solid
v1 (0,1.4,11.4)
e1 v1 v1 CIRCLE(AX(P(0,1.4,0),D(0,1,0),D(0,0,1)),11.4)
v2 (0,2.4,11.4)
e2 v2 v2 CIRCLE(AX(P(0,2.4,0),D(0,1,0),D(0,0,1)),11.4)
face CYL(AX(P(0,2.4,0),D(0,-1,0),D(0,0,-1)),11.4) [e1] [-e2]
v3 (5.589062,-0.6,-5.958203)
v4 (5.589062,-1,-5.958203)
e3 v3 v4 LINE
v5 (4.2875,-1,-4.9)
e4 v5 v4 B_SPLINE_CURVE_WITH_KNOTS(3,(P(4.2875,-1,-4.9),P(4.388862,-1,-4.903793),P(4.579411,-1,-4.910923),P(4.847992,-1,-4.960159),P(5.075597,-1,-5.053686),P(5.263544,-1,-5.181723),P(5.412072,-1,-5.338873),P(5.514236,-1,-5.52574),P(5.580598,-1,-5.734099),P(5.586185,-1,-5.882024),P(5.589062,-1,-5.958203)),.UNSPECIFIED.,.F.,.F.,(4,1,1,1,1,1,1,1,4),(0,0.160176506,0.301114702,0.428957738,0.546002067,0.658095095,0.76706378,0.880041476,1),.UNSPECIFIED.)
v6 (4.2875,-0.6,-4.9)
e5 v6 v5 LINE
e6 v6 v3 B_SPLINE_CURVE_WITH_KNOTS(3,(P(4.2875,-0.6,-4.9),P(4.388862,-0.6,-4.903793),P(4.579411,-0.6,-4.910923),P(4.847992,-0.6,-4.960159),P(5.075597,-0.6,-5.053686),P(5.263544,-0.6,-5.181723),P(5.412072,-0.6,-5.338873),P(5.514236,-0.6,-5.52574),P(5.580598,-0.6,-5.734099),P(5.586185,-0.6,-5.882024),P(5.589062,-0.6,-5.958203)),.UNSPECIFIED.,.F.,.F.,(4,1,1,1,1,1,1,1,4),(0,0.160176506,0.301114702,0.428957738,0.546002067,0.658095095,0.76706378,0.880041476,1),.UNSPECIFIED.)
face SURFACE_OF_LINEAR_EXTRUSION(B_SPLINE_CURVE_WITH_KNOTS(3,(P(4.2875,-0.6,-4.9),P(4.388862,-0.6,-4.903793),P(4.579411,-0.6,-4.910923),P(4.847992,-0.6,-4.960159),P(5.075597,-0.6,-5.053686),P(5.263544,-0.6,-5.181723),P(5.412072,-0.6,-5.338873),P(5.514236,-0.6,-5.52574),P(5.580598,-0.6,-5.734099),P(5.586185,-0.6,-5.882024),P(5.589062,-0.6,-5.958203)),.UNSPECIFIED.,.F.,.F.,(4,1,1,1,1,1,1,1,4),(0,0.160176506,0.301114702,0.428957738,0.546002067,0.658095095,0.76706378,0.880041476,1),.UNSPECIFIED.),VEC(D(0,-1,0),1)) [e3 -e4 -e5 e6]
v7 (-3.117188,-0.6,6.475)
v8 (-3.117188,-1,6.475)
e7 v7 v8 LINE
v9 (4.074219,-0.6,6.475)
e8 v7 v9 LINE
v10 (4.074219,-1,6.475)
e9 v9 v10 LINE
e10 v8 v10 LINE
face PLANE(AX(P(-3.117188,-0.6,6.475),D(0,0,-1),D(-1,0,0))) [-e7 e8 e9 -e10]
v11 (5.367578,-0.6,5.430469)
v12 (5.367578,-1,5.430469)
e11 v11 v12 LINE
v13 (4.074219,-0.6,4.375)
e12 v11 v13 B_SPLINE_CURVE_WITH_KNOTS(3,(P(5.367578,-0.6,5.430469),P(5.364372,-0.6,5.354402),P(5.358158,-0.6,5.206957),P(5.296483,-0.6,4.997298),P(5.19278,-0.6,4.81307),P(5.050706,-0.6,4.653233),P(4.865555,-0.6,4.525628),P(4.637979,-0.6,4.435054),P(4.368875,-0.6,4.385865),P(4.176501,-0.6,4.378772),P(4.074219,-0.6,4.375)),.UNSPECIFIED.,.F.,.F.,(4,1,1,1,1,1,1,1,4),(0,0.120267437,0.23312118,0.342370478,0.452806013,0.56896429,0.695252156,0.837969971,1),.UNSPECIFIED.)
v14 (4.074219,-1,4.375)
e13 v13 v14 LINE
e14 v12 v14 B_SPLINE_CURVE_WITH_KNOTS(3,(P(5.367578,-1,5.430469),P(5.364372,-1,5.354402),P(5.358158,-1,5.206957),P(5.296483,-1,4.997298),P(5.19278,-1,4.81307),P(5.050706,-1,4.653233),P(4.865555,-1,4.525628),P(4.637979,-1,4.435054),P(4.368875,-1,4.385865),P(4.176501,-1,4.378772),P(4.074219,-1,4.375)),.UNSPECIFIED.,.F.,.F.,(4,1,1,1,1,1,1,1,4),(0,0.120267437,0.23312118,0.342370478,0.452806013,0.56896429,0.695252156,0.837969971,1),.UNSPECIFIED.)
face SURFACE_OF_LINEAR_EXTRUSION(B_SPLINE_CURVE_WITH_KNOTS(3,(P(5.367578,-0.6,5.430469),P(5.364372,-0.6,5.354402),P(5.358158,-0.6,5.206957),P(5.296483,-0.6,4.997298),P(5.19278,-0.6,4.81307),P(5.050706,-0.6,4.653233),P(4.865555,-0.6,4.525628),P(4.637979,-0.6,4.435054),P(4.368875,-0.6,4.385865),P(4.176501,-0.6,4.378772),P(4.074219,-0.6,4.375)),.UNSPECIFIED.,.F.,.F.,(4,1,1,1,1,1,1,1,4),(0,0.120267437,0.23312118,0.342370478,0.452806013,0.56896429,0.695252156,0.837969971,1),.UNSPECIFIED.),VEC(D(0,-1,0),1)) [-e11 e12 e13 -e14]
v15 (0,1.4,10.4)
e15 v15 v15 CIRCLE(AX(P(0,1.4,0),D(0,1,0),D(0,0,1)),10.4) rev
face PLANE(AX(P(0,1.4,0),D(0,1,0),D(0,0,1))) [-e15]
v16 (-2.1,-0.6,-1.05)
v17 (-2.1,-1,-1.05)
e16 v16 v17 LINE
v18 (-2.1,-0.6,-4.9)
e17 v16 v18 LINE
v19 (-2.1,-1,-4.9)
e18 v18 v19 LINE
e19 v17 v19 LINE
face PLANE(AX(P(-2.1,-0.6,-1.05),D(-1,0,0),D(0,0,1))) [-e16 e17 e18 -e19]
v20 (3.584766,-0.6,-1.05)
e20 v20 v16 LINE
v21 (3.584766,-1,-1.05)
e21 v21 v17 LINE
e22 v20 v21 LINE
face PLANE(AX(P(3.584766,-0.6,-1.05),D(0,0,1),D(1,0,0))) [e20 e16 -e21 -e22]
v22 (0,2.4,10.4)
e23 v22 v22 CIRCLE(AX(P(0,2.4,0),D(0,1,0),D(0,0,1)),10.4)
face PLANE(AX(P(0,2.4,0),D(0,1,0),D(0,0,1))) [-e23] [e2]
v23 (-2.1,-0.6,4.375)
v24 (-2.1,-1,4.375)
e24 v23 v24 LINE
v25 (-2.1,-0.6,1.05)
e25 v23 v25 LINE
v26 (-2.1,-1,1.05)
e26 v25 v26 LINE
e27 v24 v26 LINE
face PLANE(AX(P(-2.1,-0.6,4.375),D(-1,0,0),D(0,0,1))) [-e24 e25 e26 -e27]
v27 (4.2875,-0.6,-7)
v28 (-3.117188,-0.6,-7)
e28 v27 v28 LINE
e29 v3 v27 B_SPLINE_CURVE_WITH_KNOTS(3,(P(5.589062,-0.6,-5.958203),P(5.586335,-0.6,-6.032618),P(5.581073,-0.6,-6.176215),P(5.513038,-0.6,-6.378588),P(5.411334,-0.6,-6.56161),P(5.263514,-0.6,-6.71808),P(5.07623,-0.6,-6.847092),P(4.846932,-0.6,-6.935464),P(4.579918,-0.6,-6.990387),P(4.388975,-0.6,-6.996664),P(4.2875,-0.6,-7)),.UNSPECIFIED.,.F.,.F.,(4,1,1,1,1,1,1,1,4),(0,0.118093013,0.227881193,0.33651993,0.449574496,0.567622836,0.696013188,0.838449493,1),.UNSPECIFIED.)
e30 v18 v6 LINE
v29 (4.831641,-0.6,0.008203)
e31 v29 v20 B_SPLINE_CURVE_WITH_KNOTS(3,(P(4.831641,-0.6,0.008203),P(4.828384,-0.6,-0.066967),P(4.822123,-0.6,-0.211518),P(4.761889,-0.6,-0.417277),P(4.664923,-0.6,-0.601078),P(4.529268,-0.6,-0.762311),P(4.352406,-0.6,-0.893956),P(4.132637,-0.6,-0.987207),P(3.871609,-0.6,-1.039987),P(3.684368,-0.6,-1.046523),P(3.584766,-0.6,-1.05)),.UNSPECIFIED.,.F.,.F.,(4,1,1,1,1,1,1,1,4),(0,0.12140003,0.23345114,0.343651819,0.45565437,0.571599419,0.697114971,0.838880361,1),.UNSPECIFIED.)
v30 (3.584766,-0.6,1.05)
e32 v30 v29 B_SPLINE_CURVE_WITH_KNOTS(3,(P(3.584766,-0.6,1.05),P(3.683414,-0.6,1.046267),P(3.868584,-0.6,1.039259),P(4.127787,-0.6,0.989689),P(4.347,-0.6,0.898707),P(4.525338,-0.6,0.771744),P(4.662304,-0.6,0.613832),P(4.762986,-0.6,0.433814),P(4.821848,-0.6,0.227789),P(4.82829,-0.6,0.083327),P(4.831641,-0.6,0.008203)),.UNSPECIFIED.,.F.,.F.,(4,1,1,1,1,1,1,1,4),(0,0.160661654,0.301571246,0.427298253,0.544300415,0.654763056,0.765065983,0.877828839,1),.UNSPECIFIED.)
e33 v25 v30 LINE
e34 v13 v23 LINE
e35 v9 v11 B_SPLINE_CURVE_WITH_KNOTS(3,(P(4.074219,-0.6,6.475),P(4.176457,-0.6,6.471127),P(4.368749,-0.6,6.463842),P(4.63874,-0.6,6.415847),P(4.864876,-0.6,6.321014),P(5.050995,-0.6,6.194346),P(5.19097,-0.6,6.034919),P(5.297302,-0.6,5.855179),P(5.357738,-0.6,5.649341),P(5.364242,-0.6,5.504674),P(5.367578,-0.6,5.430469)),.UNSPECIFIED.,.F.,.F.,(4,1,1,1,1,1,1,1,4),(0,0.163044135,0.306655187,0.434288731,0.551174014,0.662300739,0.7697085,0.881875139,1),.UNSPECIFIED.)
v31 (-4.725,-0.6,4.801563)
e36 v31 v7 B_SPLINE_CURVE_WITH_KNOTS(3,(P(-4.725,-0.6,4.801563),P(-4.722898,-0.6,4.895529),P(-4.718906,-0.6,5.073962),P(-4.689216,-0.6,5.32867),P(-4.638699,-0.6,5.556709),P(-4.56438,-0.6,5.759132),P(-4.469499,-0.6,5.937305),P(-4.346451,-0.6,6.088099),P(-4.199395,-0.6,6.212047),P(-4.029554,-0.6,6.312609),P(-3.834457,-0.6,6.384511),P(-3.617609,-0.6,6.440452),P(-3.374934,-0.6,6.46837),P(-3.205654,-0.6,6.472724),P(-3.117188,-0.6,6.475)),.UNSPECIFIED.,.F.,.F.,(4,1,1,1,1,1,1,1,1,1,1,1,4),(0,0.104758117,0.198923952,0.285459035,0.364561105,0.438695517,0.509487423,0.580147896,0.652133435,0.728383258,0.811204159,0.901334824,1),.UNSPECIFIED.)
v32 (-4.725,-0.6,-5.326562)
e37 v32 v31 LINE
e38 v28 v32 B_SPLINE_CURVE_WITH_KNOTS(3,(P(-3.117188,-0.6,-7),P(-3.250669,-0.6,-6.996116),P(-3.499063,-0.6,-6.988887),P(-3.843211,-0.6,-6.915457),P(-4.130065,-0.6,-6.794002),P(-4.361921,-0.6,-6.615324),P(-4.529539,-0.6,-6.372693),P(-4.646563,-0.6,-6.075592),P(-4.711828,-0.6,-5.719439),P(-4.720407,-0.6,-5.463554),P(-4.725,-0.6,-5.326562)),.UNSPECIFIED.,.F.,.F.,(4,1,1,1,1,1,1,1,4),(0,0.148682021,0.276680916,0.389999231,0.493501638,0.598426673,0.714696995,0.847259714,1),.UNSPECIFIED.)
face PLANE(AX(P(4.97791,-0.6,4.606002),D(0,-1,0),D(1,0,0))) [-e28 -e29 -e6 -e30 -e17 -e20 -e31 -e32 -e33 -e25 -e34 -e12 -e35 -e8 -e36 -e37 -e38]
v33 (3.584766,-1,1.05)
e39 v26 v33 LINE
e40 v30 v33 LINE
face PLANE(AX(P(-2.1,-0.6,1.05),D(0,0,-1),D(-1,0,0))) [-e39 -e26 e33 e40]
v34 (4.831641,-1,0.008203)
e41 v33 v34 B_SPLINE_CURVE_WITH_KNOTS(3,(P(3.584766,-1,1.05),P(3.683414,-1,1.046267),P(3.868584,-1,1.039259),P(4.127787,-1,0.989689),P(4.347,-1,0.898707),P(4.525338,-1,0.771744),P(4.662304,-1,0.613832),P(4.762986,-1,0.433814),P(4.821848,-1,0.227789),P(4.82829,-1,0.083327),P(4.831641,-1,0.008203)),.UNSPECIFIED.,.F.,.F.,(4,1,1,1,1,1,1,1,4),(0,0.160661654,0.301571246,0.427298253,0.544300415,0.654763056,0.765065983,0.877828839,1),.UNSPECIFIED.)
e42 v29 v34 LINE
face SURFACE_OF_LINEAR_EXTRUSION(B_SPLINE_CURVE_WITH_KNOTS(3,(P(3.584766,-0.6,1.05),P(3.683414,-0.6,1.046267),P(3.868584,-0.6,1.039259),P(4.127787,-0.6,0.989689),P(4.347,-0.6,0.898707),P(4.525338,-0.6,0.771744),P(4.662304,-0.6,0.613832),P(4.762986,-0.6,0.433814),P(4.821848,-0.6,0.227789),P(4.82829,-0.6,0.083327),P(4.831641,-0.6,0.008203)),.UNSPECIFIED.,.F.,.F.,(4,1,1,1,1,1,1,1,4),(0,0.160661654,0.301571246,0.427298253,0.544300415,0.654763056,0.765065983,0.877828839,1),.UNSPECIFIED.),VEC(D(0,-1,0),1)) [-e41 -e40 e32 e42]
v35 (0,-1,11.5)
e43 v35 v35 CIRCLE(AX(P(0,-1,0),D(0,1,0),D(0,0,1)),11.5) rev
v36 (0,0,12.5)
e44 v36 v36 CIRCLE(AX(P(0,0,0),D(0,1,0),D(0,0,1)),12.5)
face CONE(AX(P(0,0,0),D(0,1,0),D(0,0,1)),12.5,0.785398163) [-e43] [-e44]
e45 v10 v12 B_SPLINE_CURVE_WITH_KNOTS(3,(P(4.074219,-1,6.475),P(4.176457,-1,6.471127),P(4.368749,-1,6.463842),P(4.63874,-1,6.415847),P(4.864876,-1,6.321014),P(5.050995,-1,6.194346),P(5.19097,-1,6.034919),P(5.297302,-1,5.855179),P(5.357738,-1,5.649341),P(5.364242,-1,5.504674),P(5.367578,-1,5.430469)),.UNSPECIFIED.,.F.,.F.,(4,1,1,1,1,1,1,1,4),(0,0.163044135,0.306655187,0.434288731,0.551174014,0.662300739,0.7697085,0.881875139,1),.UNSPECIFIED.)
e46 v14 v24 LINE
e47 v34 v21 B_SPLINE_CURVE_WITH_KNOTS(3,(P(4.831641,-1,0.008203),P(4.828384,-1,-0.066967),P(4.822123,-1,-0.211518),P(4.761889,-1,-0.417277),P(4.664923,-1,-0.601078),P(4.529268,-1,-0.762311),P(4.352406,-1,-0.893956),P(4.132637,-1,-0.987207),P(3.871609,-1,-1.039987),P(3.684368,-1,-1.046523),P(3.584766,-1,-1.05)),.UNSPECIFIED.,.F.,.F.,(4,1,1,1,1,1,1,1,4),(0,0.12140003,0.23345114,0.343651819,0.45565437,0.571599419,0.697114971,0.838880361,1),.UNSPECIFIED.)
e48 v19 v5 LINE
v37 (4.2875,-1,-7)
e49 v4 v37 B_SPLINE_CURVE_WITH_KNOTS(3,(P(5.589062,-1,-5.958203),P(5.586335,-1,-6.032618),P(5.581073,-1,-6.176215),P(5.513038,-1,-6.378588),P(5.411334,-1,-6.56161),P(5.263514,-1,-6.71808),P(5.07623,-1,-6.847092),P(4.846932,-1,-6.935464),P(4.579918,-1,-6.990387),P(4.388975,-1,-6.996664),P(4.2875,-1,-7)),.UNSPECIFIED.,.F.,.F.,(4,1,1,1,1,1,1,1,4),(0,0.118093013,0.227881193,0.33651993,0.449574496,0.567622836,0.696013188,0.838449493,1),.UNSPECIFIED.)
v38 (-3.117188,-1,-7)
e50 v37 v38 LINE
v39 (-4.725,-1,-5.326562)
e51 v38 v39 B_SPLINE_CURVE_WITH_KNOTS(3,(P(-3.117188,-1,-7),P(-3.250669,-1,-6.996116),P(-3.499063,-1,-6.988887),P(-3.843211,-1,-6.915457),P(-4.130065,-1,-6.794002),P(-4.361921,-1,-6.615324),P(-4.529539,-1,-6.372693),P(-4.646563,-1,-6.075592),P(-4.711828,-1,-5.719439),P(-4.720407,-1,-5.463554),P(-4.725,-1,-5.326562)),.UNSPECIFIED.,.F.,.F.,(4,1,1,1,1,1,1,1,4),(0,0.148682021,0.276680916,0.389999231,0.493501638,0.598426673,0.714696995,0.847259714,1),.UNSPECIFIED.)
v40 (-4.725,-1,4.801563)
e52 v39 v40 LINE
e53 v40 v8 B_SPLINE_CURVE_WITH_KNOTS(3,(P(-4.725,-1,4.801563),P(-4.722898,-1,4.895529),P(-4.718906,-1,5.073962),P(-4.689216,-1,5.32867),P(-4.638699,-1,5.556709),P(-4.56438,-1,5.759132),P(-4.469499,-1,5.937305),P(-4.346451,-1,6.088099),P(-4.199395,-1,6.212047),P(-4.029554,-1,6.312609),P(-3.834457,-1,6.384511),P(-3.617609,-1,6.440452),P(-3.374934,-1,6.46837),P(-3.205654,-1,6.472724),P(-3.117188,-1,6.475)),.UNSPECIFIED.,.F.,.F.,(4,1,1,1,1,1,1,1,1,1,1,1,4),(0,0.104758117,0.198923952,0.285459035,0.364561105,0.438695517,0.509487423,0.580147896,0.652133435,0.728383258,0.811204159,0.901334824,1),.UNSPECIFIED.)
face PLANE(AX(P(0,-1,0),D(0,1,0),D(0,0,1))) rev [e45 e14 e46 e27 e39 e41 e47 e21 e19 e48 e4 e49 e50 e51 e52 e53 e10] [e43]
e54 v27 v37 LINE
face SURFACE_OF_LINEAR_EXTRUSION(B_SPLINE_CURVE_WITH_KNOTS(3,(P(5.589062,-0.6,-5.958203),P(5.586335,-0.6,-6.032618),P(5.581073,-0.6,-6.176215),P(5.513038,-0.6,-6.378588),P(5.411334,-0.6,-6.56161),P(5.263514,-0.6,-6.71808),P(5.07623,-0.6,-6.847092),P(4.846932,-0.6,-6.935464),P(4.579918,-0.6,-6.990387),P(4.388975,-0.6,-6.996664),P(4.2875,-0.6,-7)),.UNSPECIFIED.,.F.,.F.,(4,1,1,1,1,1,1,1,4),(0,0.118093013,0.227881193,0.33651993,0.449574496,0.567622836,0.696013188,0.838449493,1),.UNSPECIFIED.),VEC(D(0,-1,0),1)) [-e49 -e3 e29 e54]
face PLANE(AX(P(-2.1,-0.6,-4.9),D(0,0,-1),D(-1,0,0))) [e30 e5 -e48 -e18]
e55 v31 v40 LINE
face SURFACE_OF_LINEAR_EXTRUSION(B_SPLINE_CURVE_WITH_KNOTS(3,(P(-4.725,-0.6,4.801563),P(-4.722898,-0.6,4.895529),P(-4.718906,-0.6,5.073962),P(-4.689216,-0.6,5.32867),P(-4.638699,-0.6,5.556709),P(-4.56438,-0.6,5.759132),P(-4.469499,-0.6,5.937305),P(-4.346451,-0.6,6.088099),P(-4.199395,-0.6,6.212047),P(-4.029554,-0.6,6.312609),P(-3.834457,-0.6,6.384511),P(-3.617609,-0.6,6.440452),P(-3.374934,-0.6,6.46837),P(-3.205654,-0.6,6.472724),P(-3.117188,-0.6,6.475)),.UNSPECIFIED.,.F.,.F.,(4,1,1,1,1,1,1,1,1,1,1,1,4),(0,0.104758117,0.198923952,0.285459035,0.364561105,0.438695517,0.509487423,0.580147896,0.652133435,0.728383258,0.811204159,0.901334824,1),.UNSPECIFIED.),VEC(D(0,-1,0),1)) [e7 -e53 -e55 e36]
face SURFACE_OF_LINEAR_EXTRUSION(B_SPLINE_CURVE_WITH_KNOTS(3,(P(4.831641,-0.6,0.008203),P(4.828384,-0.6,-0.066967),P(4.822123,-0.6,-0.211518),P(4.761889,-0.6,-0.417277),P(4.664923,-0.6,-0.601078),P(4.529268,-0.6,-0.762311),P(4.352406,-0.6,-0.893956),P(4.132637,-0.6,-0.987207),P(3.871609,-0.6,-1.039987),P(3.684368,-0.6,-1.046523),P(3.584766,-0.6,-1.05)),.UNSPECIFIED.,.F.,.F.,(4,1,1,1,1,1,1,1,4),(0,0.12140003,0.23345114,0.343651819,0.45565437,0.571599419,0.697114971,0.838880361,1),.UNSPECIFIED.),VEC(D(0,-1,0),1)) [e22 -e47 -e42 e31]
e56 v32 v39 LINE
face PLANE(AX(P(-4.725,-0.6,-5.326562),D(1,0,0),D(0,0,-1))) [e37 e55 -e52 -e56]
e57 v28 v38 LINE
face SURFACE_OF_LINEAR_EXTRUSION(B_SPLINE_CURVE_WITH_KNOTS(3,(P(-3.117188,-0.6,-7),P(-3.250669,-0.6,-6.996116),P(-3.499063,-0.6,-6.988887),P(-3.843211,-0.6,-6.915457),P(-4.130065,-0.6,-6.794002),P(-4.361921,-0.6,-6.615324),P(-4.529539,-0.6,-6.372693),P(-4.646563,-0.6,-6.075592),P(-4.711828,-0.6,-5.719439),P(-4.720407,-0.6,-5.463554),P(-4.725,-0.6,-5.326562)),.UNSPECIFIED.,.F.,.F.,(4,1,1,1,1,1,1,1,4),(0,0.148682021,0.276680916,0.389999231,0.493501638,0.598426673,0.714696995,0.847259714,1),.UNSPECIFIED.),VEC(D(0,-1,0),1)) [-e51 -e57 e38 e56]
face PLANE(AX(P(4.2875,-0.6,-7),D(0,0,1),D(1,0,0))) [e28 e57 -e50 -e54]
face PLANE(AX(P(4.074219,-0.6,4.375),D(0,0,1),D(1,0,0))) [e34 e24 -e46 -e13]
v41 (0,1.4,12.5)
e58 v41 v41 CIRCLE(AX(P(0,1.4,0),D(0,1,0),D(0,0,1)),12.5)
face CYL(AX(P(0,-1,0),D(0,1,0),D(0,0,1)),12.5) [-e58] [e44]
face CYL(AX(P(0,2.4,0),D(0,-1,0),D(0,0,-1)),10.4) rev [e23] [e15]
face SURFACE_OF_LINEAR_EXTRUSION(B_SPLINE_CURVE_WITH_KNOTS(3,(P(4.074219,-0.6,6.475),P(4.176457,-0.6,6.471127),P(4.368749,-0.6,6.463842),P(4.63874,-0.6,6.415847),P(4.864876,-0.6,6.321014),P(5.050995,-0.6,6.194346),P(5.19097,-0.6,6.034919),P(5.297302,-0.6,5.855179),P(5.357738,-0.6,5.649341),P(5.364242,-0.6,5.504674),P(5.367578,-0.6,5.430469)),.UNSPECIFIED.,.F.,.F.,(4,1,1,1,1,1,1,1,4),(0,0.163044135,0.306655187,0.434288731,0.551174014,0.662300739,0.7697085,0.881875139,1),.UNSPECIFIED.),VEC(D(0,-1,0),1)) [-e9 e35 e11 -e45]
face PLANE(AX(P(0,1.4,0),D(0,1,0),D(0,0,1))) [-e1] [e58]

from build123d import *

# Parameters (mm, degrees)
BOSS_EXTRUDE1_DEPTH      = 1.4
BOSS_EXTRUDE1_DEPTH_BACK = 1
SKETCH1_R                = 12.5
SKETCH2_R                = 11.4
SKETCH2_R_2              = 10.4
BOSS_EXTRUDE2_DEPTH      = 1
CHAMFER1_SIZE            = 1
CUT_EXTRUDE6_DEPTH       = 0.4


with BuildPart() as part:
    # Sketch1 → Boss-Extrude1 (new, two sides: drawn at the far end of the back side and taken through both)
    with BuildSketch(Plane(origin=(0, 0, 0), x_dir=(1, 0, 0), z_dir=(0, 1, 0)).offset(-BOSS_EXTRUDE1_DEPTH_BACK)):
        with Locations(Location((0, 0, 0), (0, 0, 270))):
            Circle(SKETCH1_R)
    extrude(amount=BOSS_EXTRUDE1_DEPTH + BOSS_EXTRUDE1_DEPTH_BACK)

    # Sketch2 → Boss-Extrude2 (add)
    with BuildSketch(Plane(origin=(0, 1.4, 0), x_dir=(1, 0, 0), z_dir=(0, 1, 0))):
        with Locations(Location((0, 0, 0), (0, 0, 270))):
            Circle(SKETCH2_R)
        with Locations(Location((0, 0, 0), (0, 0, 270))):
            Circle(SKETCH2_R_2, mode=Mode.SUBTRACT)
    extrude(amount=BOSS_EXTRUDE2_DEPTH)

    # Chamfer1
    chamfer1_edges = [part.edges().sort_by_distance(p)[0] for p in [
        (0, -1, -12.5),
    ]]
    chamfer(chamfer1_edges, length=CHAMFER1_SIZE - 0.0001)  # a hair under: the kernel refuses the full size

    # Sketch8 → Cut-Extrude6 (cut)
    with BuildSketch(Plane.XZ.offset(1)):
        with BuildLine():
            Line((4.07421875, 4.375), (-2.1, 4.375))
            Line((-2.1, 4.375), (-2.1, 1.05))
            Line((-2.1, 1.05), (3.584765625, 1.05))
            add(Edge.make_bspline(
                [(3.584765625, 1.05), (3.683414496, 1.046266561), (3.868584149, 1.03925868), (4.127786585, 0.989689139), (4.346999538, 0.898706669), (4.525338462, 0.771743669), (4.662303563, 0.613832259), (4.762986434, 0.433813713), (4.821847618, 0.22778939), (4.828290287, 0.083326956), (4.831640625, 0.008203125)],
                knots=[0, 0, 0, 0, 1.285293232, 2.412569968, 3.418386025, 4.354403319, 5.23810445, 6.120527863, 7.022630715, 8, 8, 8, 8], degree=3))
            add(Edge.make_bspline(
                [(4.831640625, 0.008203125), (4.828384414, -0.066966736), (4.82212275, -0.211517688), (4.761888965, -0.417277321), (4.664922704, -0.60107826), (4.529268349, -0.762310942), (4.352406057, -0.893955903), (4.132637348, -0.987206532), (3.871609167, -1.039986965), (3.684368347, -1.046523103), (3.584765625, -1.05)],
                knots=[0, 0, 0, 0, 0.971200242, 1.867609123, 2.749214551, 3.645234956, 4.57279535, 5.576919765, 6.711042891, 8, 8, 8, 8], degree=3))
            Line((3.584765625, -1.05), (-2.1, -1.05))
            Line((-2.1, -1.05), (-2.1, -4.9))
            Line((-2.1, -4.9), (4.2875, -4.9))
            add(Edge.make_bspline(
                [(4.2875, -4.9), (4.388861848, -4.903792751), (4.579411283, -4.910922716), (4.847992302, -4.960158814), (5.075597112, -5.053685525), (5.263543825, -5.181722918), (5.412072035, -5.338872712), (5.514235934, -5.525740129), (5.58059817, -5.734099342), (5.586185244, -5.882024152), (5.5890625, -5.958203125)],
                knots=[0, 0, 0, 0, 1.281412047, 2.408917619, 3.431661904, 4.368016538, 5.264760761, 6.136510243, 7.040331808, 8, 8, 8, 8], degree=3))
            add(Edge.make_bspline(
                [(5.5890625, -5.958203125), (5.58633538, -6.032618077), (5.581072924, -6.176214785), (5.513038458, -6.378588348), (5.411333521, -6.561610493), (5.26351397, -6.718079765), (5.076230138, -6.847091674), (4.84693188, -6.935464254), (4.579917838, -6.99038683), (4.388974679, -6.996664043), (4.2875, -7)],
                knots=[0, 0, 0, 0, 0.944744106, 1.823049547, 2.692159438, 3.596595969, 4.540982691, 5.5681055, 6.707595947, 8, 8, 8, 8], degree=3))
            Line((4.2875, -7), (-3.1171875, -7))
            add(Edge.make_bspline(
                [(-3.1171875, -7), (-3.250668685, -6.996115514), (-3.499062513, -6.988886912), (-3.843210801, -6.9154574), (-4.13006517, -6.794002261), (-4.361921166, -6.615323708), (-4.529538591, -6.372693255), (-4.646563385, -6.075591851), (-4.711828234, -5.719439126), (-4.720407168, -5.463553728), (-4.725, -5.3265625)],
                knots=[0, 0, 0, 0, 1.189456171, 2.21344733, 3.119993849, 3.948013107, 4.78741338, 5.71757596, 6.778077714, 8, 8, 8, 8], degree=3))
            Line((-4.725, -5.3265625), (-4.725, 4.8015625))
            add(Edge.make_bspline(
                [(-4.725, 4.8015625), (-4.722897792, 4.895529375), (-4.718905933, 5.073961966), (-4.689215801, 5.328670238), (-4.638698759, 5.55670946), (-4.564380189, 5.759131594), (-4.469499051, 5.937304781), (-4.346451413, 6.088099292), (-4.199394628, 6.212046955), (-4.029553563, 6.312609172), (-3.834457239, 6.384510805), (-3.617609334, 6.440451749), (-3.374933573, 6.468369986), (-3.205653623, 6.472724382), (-3.1171875, 6.475)],
                knots=[0, 0, 0, 0, 1.257097402, 2.387087425, 3.425508426, 4.374733264, 5.264346199, 6.113849079, 6.961774747, 7.825601221, 8.740599092, 9.73444991, 10.816017894, 12, 12, 12, 12], degree=3))
            Line((-3.1171875, 6.475), (4.07421875, 6.475))
            add(Edge.make_bspline(
                [(4.07421875, 6.475), (4.176457481, 6.471126765), (4.368749199, 6.463841942), (4.638739507, 6.415846948), (4.864876279, 6.321013969), (5.050994869, 6.19434625), (5.190969541, 6.034918564), (5.297302215, 5.855179123), (5.35773805, 5.64934083), (5.364242009, 5.504673744), (5.367578125, 5.43046875)],
                knots=[0, 0, 0, 0, 1.304353081, 2.453241492, 3.474309848, 4.409392115, 5.298405909, 6.157667996, 7.055001114, 8, 8, 8, 8], degree=3))
            add(Edge.make_bspline(
                [(5.367578125, 5.43046875), (5.364372303, 5.354401915), (5.358158277, 5.206957264), (5.296483306, 4.997297579), (5.192779923, 4.813069646), (5.050706318, 4.653232754), (4.865555272, 4.525627798), (4.637979495, 4.435054103), (4.368875398, 4.385865259), (4.176501287, 4.378771597), (4.07421875, 4.375)],
                knots=[0, 0, 0, 0, 0.962139494, 1.864969442, 2.738963821, 3.622448103, 4.551714319, 5.562017248, 6.70375977, 8, 8, 8, 8], degree=3))
        make_face()
    extrude(amount=-CUT_EXTRUDE6_DEPTH, mode=Mode.SUBTRACT)


solid = part.part
